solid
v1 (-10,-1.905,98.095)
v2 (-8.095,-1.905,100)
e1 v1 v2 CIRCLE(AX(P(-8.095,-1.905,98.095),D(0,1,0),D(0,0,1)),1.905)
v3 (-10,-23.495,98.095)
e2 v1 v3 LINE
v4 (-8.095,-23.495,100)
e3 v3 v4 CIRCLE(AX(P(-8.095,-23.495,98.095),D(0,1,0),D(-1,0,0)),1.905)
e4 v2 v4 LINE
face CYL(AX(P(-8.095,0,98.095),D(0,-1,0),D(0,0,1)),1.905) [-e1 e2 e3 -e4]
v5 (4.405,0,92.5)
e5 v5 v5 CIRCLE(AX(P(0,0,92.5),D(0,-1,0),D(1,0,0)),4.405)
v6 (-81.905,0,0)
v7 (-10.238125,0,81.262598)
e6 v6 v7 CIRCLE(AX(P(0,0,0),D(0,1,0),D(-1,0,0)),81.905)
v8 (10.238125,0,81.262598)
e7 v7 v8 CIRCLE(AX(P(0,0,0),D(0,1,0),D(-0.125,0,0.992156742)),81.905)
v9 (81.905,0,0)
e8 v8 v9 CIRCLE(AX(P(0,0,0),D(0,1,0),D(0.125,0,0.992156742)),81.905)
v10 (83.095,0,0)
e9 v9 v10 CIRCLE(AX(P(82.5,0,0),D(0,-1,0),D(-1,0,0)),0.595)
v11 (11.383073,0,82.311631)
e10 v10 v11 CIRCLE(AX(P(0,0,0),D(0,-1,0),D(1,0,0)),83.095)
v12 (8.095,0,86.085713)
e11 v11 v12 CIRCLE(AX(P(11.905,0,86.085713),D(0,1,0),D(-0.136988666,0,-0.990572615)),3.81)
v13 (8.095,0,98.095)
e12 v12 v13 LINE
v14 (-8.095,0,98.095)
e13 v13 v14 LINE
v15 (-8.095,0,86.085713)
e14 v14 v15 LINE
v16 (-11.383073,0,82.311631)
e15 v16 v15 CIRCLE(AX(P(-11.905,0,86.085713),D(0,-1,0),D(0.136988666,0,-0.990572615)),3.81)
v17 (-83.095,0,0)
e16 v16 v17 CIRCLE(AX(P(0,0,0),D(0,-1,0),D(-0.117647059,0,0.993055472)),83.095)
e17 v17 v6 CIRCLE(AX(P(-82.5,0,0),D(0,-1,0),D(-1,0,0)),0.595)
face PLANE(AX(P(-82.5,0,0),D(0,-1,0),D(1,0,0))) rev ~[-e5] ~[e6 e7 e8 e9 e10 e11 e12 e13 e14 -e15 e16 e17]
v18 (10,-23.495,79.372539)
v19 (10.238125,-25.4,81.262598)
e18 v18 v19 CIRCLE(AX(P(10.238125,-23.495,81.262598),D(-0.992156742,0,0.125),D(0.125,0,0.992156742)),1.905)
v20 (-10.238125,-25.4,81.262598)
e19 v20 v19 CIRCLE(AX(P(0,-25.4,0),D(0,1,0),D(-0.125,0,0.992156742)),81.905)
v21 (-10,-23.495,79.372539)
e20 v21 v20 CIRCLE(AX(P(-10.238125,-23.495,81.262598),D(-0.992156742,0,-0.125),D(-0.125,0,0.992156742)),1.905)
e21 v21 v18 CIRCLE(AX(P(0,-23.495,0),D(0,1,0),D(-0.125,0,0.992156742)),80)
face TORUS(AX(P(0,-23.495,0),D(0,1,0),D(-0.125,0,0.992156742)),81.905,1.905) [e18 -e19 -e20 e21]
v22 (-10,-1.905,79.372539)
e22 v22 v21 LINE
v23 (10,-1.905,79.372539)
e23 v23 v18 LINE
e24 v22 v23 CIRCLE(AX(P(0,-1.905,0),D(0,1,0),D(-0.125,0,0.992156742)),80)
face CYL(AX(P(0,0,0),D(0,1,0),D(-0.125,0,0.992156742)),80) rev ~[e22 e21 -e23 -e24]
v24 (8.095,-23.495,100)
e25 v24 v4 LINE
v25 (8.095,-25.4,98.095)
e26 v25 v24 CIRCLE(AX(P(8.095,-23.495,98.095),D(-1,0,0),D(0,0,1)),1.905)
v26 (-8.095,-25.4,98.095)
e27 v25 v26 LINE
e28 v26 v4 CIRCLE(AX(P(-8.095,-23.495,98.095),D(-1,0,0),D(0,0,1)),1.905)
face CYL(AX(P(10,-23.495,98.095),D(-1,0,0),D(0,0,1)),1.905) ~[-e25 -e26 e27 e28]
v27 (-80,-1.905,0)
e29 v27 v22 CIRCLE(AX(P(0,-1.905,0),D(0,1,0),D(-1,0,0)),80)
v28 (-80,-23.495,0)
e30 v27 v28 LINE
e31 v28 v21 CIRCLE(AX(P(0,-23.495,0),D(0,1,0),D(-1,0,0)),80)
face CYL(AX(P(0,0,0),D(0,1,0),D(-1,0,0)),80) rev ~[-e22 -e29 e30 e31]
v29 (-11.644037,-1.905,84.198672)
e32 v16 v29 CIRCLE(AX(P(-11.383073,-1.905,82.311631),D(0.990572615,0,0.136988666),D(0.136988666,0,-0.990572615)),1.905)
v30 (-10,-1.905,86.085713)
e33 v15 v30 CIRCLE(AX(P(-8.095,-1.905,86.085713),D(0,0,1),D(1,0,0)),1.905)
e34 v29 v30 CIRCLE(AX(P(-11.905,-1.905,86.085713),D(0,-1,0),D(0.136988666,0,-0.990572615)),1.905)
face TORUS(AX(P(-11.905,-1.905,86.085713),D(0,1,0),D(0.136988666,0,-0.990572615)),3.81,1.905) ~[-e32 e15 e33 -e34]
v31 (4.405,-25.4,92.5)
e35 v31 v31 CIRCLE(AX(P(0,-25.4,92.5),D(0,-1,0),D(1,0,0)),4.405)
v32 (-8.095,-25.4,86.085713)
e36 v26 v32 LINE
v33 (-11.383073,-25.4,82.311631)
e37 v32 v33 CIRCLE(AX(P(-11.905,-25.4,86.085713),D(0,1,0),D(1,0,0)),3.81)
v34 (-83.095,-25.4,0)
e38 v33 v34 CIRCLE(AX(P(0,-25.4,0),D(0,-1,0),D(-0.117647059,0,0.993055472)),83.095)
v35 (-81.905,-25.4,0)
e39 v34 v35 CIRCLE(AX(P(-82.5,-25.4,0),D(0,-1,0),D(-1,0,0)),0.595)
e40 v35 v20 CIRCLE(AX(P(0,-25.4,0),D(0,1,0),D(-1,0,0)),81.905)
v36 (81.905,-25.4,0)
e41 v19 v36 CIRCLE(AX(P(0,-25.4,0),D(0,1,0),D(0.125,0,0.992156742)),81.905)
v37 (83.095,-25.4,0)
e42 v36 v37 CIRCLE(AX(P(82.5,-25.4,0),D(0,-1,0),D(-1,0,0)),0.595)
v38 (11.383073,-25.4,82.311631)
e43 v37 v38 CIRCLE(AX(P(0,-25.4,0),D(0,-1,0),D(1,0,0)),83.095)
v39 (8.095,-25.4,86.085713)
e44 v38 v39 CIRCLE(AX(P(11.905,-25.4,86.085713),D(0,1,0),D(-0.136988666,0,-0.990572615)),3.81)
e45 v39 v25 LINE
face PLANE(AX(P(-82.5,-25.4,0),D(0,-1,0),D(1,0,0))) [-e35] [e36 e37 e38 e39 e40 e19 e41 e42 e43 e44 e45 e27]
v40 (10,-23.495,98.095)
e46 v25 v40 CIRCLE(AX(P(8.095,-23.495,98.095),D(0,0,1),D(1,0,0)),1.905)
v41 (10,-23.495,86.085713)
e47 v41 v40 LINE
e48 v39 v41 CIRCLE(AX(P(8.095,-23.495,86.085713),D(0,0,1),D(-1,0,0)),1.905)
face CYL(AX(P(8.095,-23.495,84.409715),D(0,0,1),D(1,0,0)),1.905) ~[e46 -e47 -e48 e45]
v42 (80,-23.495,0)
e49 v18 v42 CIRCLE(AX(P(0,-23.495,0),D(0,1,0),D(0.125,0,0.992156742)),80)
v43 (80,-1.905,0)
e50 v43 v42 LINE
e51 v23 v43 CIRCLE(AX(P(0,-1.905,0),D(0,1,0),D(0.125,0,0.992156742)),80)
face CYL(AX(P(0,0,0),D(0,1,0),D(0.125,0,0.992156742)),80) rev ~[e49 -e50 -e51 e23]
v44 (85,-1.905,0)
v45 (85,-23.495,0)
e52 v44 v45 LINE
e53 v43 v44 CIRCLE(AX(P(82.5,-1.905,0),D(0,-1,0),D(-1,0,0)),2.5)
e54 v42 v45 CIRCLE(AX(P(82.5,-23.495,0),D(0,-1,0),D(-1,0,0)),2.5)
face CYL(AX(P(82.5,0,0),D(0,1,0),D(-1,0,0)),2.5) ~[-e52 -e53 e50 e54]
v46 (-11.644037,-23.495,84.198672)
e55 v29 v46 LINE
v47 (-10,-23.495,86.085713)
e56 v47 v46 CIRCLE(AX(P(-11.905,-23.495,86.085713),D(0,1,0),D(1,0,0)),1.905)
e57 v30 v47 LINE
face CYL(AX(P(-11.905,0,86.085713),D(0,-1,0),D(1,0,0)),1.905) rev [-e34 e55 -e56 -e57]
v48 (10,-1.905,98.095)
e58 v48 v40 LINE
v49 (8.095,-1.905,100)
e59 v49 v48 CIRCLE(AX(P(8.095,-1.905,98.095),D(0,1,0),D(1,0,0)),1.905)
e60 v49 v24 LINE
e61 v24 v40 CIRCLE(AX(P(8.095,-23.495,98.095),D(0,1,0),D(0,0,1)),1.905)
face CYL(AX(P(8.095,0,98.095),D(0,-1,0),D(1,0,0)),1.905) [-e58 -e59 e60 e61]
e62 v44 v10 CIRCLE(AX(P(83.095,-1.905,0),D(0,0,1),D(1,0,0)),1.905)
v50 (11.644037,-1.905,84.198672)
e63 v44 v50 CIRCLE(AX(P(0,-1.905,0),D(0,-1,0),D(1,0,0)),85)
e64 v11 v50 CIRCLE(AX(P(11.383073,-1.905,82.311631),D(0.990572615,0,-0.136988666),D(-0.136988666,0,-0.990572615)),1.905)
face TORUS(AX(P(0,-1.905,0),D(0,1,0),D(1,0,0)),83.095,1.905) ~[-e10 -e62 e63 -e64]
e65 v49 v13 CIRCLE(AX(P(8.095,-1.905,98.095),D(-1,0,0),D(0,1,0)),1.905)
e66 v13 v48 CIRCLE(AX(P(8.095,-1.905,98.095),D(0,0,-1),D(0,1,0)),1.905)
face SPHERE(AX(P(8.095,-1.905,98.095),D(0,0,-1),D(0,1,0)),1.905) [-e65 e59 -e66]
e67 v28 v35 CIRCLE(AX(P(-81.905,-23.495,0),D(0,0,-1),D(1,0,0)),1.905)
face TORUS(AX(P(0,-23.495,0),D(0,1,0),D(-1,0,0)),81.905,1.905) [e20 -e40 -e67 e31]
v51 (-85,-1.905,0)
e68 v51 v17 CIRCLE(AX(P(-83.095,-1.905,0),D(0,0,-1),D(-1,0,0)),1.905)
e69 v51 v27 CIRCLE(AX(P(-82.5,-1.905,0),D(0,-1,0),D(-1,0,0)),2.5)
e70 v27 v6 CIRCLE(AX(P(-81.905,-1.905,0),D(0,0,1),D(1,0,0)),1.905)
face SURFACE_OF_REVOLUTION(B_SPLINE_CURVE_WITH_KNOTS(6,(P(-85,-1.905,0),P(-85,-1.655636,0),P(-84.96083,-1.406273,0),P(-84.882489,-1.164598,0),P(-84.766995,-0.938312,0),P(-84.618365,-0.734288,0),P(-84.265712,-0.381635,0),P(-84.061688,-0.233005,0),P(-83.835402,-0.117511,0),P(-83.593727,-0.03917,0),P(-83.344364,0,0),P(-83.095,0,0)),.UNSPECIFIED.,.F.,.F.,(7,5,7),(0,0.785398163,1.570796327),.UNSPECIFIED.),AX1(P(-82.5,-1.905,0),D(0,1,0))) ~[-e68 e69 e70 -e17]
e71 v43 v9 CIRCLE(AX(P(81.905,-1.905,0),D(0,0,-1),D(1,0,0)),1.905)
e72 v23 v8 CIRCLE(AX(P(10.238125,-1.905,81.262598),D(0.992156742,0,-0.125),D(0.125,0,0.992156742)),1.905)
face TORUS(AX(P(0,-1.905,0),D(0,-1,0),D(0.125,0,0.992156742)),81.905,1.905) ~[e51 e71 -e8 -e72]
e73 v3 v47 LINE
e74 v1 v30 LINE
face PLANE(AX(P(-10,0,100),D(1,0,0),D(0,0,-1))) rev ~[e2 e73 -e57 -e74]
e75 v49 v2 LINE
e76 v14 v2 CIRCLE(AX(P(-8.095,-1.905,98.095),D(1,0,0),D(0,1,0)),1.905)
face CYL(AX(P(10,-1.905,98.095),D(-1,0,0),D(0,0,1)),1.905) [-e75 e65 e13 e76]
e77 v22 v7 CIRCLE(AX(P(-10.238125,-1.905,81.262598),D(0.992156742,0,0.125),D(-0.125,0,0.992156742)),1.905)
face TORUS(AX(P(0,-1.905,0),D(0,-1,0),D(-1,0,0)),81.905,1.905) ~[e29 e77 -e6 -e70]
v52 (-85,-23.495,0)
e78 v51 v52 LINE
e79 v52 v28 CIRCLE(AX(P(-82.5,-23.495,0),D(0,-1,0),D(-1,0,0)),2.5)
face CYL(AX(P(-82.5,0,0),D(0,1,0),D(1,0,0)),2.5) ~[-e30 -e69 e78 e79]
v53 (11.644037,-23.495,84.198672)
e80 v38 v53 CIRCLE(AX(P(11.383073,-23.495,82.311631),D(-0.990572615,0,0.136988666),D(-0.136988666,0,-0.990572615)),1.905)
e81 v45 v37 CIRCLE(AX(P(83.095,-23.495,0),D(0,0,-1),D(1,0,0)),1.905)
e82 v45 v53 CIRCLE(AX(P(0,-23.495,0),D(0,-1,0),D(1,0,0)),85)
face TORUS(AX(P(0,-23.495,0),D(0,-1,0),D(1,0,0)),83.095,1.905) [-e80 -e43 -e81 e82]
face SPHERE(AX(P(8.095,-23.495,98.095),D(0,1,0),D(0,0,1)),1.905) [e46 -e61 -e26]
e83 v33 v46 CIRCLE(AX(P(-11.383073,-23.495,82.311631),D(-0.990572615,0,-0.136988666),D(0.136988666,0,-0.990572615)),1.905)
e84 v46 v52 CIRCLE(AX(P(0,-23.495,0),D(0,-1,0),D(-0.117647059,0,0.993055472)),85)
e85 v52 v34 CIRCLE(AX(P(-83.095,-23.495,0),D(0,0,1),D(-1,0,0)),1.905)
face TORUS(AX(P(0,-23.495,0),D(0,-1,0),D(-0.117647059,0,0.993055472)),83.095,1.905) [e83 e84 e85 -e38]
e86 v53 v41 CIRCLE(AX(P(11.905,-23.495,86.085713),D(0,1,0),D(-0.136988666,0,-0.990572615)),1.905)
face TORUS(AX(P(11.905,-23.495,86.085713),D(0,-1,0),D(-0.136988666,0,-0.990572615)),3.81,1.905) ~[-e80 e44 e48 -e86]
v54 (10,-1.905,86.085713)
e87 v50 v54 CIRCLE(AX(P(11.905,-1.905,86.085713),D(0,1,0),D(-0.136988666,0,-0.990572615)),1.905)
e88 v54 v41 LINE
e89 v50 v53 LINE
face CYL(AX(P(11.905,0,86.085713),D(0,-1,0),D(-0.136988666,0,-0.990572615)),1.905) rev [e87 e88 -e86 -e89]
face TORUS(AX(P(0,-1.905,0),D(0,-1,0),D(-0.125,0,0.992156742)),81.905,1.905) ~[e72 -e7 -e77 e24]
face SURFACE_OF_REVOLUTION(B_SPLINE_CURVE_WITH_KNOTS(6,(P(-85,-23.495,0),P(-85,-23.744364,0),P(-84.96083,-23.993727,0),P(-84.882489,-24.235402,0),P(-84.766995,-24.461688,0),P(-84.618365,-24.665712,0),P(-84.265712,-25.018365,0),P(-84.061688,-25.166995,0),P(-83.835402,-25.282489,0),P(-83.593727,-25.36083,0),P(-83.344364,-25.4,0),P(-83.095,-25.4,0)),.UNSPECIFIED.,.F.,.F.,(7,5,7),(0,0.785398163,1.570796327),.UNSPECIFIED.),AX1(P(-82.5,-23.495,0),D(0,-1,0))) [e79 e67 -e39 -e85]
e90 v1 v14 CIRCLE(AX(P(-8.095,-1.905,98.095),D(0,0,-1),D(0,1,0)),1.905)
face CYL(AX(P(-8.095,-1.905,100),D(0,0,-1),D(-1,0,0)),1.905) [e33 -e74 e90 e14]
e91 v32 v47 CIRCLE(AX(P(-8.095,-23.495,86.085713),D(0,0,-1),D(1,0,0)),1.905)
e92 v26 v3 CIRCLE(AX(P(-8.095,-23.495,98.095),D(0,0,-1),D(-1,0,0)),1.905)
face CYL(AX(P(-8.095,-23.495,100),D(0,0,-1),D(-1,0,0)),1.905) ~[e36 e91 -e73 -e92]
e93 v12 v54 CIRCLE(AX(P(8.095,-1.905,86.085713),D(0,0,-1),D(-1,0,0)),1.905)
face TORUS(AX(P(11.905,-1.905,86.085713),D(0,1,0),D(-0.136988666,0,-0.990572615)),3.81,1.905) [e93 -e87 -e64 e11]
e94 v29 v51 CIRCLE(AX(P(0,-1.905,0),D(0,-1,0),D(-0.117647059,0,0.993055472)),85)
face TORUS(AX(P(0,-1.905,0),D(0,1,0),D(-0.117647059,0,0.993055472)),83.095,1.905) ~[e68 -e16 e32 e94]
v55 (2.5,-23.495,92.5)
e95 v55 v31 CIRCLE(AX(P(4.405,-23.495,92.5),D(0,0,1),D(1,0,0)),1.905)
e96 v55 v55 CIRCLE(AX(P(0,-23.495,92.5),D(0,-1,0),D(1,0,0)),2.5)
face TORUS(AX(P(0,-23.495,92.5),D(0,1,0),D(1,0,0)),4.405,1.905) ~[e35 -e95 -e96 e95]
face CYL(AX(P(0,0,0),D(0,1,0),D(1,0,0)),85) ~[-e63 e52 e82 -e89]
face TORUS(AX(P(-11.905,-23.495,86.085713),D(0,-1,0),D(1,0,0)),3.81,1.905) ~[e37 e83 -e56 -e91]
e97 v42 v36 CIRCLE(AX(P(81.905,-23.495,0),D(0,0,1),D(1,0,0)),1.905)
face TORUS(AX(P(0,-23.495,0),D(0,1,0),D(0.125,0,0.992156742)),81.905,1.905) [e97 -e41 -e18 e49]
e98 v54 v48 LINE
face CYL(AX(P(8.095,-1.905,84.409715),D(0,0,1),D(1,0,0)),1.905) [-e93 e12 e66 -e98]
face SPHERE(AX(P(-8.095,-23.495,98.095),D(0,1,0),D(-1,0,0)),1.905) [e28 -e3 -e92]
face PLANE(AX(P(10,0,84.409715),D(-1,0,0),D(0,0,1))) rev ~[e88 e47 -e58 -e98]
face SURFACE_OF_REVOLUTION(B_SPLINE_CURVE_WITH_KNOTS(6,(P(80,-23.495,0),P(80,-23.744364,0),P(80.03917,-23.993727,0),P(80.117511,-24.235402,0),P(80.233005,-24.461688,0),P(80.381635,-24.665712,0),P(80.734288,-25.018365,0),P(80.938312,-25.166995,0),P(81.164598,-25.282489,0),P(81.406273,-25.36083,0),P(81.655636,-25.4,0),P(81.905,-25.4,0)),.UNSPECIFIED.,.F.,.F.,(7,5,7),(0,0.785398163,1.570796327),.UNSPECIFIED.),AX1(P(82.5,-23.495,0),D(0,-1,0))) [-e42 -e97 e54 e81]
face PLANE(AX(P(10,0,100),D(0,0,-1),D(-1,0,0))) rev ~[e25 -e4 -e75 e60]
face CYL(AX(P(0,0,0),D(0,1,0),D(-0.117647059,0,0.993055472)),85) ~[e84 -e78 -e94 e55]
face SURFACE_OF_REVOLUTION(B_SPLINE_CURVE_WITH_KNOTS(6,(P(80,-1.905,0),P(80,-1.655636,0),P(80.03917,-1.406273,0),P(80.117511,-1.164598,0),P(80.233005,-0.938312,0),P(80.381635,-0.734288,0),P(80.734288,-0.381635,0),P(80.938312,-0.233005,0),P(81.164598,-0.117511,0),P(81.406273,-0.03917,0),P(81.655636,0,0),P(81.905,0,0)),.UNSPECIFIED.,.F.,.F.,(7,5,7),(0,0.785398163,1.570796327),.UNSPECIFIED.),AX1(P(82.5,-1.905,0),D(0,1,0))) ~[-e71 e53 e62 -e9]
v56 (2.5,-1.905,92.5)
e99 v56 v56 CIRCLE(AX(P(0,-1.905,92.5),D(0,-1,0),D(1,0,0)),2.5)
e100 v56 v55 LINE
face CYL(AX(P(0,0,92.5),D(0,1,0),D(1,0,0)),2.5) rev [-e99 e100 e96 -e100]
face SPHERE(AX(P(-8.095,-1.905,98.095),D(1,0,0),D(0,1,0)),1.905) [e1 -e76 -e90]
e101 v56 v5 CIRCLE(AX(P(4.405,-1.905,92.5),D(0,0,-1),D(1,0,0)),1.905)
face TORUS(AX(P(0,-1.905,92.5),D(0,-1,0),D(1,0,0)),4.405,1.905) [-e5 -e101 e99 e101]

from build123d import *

# Parameters (mm, degrees)
F0_R     = 2.5
F1_DEPTH = 25.4
F2_R     = 1.905


with BuildPart() as f1:
    # F0 (on Front) → F1 (new body)
    with BuildSketch(Plane.XZ):
        with BuildLine():
            ThreePointArc((-85, 0), (-82.5, -2.5), (-80, 0))
            ThreePointArc((-80, 0), (-82.5, 2.5), (-85, 0))
        make_face()
        with BuildLine():
            ThreePointArc((-80, 0), (-60, 52.9150262213), (-10, 79.3725393319))
            Line((-10, 79.3725393319), (-10, 84.4097150807))
            ThreePointArc((-10, 84.4097150807), (-63.5413251357, 56.4579489532), (-85, 0))
            ThreePointArc((-85, 0), (-82.5, 2.5), (-80, 0))
        make_face()
        with BuildLine():
            ThreePointArc((-10, 84.4097150807), (0, 85), (10, 84.4097150807))
            Line((10, 84.4097150807), (10, 100))
            Line((10, 100), (-10, 100))
            Line((-10, 100), (-10, 84.4097150807))
        make_face()
        with Locations((0, 92.5)):
            Circle(F0_R, mode=Mode.SUBTRACT)
        with BuildLine():
            ThreePointArc((-10, 79.3725393319), (0, 80), (10, 79.3725393319))
            Line((10, 79.3725393319), (10, 84.4097150807))
            ThreePointArc((10, 84.4097150807), (0, 85), (-10, 84.4097150807))
            Line((-10, 84.4097150807), (-10, 79.3725393319))
        make_face()
        with BuildLine():
            ThreePointArc((10, 79.3725393319), (60, 52.9150262213), (80, 0))
            ThreePointArc((80, 0), (82.5, -2.5), (85, 0))
            ThreePointArc((85, 0), (63.5413251357, 56.4579489532), (10, 84.4097150807))
            Line((10, 84.4097150807), (10, 79.3725393319))
        make_face()
    extrude(amount=F1_DEPTH)

    # F2
    f2_edges = [f1.edges().sort_by_distance(p)[0] for p in [
        (85, -12.7, 0),
        (10, -12.7, 84.409715),
        (63.541325, 0, 56.457949),
        (63.541325, -25.4, 56.457949),
        (-82.5, 0, -2.5),
        (0, 0, 80),
        (82.5, 0, -2.5),
        (10, 0, 92.204858),
        (0, 0, 100),
        (-10, 0, 92.204858),
        (-63.541325, 0, 56.457949),
        (-2.5, 0, 92.5),
        (-2.5, -25.4, 92.5),
        (-10, -12.7, 100),
        (-10, -12.7, 84.409715),
        (-10, -25.4, 92.204858),
        (10, -12.7, 100),
        (0, -25.4, 100),
        (-82.5, -25.4, -2.5),
        (0, -25.4, 80),
        (82.5, -25.4, -2.5),
        (10, -25.4, 92.204858),
        (-63.541325, -25.4, 56.457949),
    ]]
    fillet(f2_edges, radius=F2_R)


solid = f1.part
